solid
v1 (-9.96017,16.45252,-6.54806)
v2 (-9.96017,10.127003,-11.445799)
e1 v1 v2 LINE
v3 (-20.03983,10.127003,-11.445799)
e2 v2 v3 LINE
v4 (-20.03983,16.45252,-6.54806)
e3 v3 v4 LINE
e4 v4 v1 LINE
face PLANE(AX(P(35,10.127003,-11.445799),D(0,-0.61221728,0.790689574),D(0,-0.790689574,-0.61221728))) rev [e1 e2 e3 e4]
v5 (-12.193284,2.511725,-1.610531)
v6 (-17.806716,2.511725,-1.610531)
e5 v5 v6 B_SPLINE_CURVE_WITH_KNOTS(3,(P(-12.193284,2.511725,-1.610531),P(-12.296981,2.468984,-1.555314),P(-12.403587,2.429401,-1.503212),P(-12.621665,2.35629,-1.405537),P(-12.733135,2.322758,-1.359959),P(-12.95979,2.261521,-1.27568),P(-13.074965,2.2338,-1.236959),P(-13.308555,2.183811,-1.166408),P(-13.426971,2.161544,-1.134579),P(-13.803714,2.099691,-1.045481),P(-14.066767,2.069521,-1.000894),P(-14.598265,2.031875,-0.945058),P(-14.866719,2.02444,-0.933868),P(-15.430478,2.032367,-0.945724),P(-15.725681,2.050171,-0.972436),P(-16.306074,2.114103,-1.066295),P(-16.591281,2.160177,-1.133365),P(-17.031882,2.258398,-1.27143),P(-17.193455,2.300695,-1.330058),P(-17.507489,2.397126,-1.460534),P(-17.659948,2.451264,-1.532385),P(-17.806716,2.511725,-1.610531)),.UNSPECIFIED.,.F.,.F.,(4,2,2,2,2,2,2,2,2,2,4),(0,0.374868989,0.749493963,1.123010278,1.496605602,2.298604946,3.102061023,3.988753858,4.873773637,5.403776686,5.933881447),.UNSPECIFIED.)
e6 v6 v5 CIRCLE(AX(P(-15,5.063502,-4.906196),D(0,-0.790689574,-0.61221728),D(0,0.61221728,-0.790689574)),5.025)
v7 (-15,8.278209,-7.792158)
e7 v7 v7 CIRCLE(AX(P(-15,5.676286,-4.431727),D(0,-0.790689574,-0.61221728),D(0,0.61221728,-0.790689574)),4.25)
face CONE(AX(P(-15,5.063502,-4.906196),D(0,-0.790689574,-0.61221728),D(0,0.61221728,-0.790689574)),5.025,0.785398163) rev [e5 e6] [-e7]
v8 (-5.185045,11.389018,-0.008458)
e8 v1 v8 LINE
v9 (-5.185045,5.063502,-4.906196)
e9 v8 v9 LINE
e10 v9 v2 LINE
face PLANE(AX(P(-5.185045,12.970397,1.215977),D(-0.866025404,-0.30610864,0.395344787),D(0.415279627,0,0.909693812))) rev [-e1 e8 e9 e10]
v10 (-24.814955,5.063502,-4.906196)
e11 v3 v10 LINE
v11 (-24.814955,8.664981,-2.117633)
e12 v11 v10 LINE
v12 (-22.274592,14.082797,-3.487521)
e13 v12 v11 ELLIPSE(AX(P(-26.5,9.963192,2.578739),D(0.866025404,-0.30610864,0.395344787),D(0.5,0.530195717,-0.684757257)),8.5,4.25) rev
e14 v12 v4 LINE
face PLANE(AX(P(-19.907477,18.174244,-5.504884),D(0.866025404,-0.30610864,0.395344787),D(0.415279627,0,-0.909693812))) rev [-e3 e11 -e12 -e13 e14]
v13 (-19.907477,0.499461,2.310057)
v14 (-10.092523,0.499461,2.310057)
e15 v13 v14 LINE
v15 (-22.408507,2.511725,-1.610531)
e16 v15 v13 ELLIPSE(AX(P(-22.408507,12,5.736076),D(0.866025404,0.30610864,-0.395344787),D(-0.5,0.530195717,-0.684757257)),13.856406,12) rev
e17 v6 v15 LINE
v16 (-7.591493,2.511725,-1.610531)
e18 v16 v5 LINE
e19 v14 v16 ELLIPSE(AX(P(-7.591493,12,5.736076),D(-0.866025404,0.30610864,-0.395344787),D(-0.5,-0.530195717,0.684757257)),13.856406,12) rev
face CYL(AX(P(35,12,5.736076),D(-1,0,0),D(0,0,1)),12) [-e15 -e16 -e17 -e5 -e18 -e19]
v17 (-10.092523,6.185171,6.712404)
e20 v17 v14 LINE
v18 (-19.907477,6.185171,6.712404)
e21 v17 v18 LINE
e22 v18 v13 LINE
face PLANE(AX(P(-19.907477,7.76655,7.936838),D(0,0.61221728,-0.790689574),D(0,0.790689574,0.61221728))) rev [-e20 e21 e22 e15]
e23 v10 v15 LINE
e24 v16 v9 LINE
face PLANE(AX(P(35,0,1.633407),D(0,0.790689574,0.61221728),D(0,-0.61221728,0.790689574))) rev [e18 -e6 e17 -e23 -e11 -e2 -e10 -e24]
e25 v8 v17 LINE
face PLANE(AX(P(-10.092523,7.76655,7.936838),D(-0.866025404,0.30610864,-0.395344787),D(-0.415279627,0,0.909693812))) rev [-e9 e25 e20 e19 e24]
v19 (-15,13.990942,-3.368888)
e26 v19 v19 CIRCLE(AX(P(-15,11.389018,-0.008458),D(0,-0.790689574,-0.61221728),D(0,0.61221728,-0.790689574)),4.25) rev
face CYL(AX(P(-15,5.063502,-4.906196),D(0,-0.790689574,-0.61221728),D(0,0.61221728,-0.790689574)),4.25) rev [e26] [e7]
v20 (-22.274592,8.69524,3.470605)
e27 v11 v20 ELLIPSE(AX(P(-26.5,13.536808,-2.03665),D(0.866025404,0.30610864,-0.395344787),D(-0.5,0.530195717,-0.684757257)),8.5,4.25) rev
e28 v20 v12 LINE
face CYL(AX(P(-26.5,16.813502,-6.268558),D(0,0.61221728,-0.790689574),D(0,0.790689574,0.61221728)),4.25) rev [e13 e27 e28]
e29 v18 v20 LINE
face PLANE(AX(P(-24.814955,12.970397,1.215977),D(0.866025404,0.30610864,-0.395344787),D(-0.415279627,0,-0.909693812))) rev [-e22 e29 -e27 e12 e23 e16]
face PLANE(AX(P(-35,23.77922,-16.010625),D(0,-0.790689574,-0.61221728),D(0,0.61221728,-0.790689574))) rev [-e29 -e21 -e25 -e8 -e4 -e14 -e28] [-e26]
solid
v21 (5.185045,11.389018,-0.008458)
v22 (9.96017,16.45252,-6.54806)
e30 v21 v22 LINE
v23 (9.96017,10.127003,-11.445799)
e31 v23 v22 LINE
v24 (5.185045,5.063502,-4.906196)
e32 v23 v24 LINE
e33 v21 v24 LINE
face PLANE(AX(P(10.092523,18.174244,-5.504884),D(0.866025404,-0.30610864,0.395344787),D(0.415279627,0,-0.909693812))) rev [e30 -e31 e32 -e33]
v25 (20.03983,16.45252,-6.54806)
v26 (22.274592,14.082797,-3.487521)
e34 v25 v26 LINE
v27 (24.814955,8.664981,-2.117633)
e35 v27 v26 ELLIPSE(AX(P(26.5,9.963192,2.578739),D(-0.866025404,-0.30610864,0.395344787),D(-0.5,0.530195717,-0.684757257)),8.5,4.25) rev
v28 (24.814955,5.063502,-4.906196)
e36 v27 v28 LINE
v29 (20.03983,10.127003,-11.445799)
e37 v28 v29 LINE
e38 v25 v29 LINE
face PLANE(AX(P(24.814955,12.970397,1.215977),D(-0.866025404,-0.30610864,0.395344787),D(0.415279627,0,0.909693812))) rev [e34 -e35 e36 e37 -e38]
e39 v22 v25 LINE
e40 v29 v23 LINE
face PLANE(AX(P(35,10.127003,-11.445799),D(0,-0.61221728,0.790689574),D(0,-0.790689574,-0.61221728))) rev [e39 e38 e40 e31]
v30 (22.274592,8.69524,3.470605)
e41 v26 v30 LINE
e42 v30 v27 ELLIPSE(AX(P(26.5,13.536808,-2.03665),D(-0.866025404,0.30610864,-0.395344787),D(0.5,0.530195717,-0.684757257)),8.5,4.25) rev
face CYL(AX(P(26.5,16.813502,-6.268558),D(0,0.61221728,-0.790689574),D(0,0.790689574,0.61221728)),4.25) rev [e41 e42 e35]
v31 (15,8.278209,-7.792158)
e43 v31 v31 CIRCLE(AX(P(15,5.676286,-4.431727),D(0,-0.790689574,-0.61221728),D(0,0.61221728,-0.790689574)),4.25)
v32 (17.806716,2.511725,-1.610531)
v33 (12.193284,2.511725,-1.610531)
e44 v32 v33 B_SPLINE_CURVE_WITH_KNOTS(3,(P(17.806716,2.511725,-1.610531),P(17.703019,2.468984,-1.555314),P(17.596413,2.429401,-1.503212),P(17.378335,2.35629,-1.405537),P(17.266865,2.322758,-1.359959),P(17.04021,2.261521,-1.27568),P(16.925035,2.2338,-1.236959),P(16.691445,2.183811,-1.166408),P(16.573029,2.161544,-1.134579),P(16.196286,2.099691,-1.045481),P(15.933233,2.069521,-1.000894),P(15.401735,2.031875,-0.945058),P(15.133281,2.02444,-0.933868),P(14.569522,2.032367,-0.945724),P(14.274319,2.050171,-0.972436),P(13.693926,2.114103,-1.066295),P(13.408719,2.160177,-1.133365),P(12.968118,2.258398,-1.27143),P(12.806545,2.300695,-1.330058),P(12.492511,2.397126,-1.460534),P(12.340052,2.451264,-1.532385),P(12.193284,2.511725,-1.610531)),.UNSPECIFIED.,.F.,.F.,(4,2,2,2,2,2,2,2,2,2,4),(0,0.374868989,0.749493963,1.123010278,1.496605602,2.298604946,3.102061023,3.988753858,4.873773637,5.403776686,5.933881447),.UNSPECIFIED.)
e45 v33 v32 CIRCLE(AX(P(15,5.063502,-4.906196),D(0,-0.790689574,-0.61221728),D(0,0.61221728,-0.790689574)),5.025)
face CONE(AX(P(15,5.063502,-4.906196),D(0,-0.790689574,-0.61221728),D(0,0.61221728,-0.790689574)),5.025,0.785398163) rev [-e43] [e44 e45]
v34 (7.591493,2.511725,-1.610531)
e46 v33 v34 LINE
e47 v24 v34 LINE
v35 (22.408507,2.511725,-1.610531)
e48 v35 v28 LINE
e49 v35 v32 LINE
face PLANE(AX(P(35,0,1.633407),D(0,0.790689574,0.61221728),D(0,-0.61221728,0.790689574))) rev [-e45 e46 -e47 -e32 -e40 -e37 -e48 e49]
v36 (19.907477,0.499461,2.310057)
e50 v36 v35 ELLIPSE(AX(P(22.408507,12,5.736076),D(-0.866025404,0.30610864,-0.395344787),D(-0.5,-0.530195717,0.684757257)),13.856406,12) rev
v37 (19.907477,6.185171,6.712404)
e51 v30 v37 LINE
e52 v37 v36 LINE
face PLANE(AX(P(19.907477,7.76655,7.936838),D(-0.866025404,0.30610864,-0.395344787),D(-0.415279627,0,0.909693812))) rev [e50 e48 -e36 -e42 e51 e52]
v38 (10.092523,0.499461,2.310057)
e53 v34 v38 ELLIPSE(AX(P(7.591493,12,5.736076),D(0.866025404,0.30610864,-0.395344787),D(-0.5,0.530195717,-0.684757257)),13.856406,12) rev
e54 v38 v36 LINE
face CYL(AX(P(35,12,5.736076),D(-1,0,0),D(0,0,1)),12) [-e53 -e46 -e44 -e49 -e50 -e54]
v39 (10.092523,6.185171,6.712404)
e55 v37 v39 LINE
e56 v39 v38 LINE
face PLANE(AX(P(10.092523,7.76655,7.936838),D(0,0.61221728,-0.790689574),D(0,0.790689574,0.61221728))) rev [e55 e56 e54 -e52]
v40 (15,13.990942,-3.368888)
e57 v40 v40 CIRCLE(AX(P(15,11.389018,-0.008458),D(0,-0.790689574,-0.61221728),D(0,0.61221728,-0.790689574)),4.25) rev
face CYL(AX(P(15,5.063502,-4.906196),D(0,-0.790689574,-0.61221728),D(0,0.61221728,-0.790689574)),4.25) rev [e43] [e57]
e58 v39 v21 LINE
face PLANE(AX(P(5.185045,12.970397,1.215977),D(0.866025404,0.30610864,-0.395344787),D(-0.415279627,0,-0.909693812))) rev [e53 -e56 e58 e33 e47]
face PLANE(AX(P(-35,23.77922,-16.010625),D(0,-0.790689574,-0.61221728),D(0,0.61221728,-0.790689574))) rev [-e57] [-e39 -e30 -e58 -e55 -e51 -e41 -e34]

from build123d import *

# Parameters (mm, degrees)
SKETCH1_W                    = 70
SKETCH1_H                    = 60
BOSS_EXTRUDE1_DEPTH          = 23.5
SKETCH2_R                    = 4.5
CUT_EXTRUDE1_DEPTH           = 80.701003758
CUT_EXTRUDE4_DEPTH           = 80.701003758
M10_TAPPED_HOLE1_D           = 8.5
M10_TAPPED_HOLE1_DEPTH       = 27.5
M10_TAPPED_HOLE1_CSINK_D     = 10.05
M10_TAPPED_HOLE1_CSINK_ANGLE = 90
M10_TAPPED_HOLE1_TIP         = 2.553657631
M10_TAPPED_HOLE2_D           = 8.5
M10_TAPPED_HOLE2_CSINK_D     = 10.05
M10_TAPPED_HOLE2_CSINK_ANGLE = 90
SKETCH5_W                    = 3
SKETCH5_H                    = 31.956569969
SKETCH5_W_2                  = 11.5
SKETCH5_H_2                  = 27.892636229
CUT_EXTRUDE2_DEPTH           = 52.742149163
CHAMFER1_SIZE                = 3
FILLET1_R                    = 12
SKETCH9_OUTSIDE_W            = 88.936
SKETCH9_OUTSIDE_H            = 66.094
CUT_EXTRUDE5_DEPTH           = 10
CUT_EXTRUDE6_DEPTH           = 80.701003758


with BuildPart() as part:
    # Sketch1 → Boss-Extrude1 (new body)
    with BuildSketch(Plane(origin=(0, 0, 0), x_dir=(1, 0, 0), z_dir=(0, 1, 0))):
        Rectangle(SKETCH1_W, SKETCH1_H)
    extrude(amount=BOSS_EXTRUDE1_DEPTH)

    # Sketch2 → Cut-Extrude1 (cut, through all)
    with BuildSketch(Plane(origin=(35, 0, 0), x_dir=(0, 0, -1), z_dir=(1, 0, 0))):
        with Locations((-18.25, 11.75)):
            Circle(SKETCH2_R)
    extrude(amount=-CUT_EXTRUDE1_DEPTH, mode=Mode.SUBTRACT)

    # Sketch6 → Cut-Extrude4 (cut, through all)
    with BuildSketch(Plane.ZY.offset(35)):
        Polygon((1.633407015, 0), (-11.44579872, 10.127003094), (5.022332022, 31.39588867), (-21.600150891, 35.884663023), (-49.264135094, 11.821162325), (1.633407015, -46.691886902), align=None)
    extrude(amount=-CUT_EXTRUDE4_DEPTH, mode=Mode.SUBTRACT)

    # M10 Tapped Hole1
    with Locations(Plane(origin=(0, 11.814481877, -13.625207767), x_dir=(-1, 0, 0), z_dir=(0, -0.7906895737438469, -0.612217280034445))):
        with Locations((-15, -11.027098629), (15, -11.027098629)):
            CounterSinkHole(M10_TAPPED_HOLE1_D / 2, M10_TAPPED_HOLE1_CSINK_D / 2, depth=M10_TAPPED_HOLE1_DEPTH, counter_sink_angle=M10_TAPPED_HOLE1_CSINK_ANGLE)
            with Locations((0, 0, -(M10_TAPPED_HOLE1_DEPTH + M10_TAPPED_HOLE1_TIP / 2))):  # 118° drill point
                Cone(0, M10_TAPPED_HOLE1_D / 2, M10_TAPPED_HOLE1_TIP, mode=Mode.SUBTRACT)

    # M10 Tapped Hole2 (through all)
    with Locations(Plane(origin=(0, 9.336313521, -12.058016), x_dir=(-1, 0, 0), z_dir=(0, 0.6122172800344449, -0.790689573743847))):
        with Locations((-26.5, 9.456540563), (0, 9.456540563), (26.5, 9.456540563)):
            CounterSinkHole(M10_TAPPED_HOLE2_D / 2, M10_TAPPED_HOLE2_CSINK_D / 2, counter_sink_angle=M10_TAPPED_HOLE2_CSINK_ANGLE)

    # Sketch5 → Cut-Extrude2 (cut, through all)
    with BuildSketch(Plane(origin=(0, 23.5, 0), x_dir=(1, 0, 0), z_dir=(0, 1, 0))):
        with Locations((-25.25926979, -22.978284985)):
            Rectangle(SKETCH5_W, SKETCH5_H)
        with Locations((0, -20.946318115)):
            Rectangle(SKETCH5_W_2, SKETCH5_H_2)
        with Locations((25.25926979, -22.978284985)):
            Rectangle(SKETCH5_W, SKETCH5_H)
    extrude(amount=-CUT_EXTRUDE2_DEPTH, mode=Mode.SUBTRACT)

    # Chamfer1
    chamfer1_edges = [part.edges().sort_by_distance(p)[0] for p in [
        (30.879634895, 0, 30),
        (30.879634895, 23.5, 30),
        (14.754634895, 0, 30),
        (14.754634895, 23.5, 30),
        (-30.879634895, 0, 30),
        (-30.879634895, 23.5, 30),
        (-14.754634895, 0, 30),
        (-14.754634895, 23.5, 30),
    ]]
    chamfer(chamfer1_edges, length=CHAMFER1_SIZE)

    # Fillet1
    # the kernel refuses this fillet: 12 mm, written as the material it takes off along each edge
    with BuildSketch(Plane(origin=(-45.256673558, 0, 1.633407015), x_dir=(0, 0, 1), z_dir=(1, 0, 0))) as fillet1_piece_1:
        with BuildLine():
            CenterArc((FILLET1_R * 0.341889118589, -FILLET1_R), FILLET1_R, 90, 37.75)
            Line((-FILLET1_R * 0.270328161445, -FILLET1_R * 0.209310426256), (0, 0))
            Line((0, 0), (FILLET1_R * 0.341889118589, 0))
        make_face()
    extrude(amount=90.513347115, mode=Mode.SUBTRACT)

    # Sketch9 outside → Cut-Extrude5 (cut)
    with BuildSketch(Plane(origin=(0, 10.739220374, -12.236488293), x_dir=(-1, 0, 0), z_dir=(0, 0.7906895737438466, 0.612217280034445))):
        with Locations((0, 16.392)):
            Rectangle(SKETCH9_OUTSIDE_W, SKETCH9_OUTSIDE_H)
        Polygon((19.907477288, 0.770758948), (24.814954576, 9.270758948), (19.907477288, 17.770758948), (10.092522712, 17.770758948), (5.185045424, 9.270758948), (10.092522712, 0.770758948), align=None, mode=Mode.SUBTRACT)
        Polygon((-10.092522712, 0.770758948), (-5.185045424, 9.270758948), (-10.092522712, 17.770758948), (-19.907477288, 17.770758948), (-24.814954576, 9.270758948), (-19.907477288, 0.770758948), align=None, mode=Mode.SUBTRACT)
    extrude(amount=CUT_EXTRUDE5_DEPTH, mode=Mode.SUBTRACT)

    # Sketch10 → Cut-Extrude6 (cut, through all)
    with BuildSketch(Plane(origin=(35, 0, 0), x_dir=(0, 0, -1), z_dir=(1, 0, 0))):
        Polygon((-12.900576366, 61.118553113), (16.010624605, 23.779219648), (-27.760891181, -10.112308997), (-56.672092153, 27.227024468), align=None)
    extrude(amount=-CUT_EXTRUDE6_DEPTH, mode=Mode.SUBTRACT)


with BuildPart() as cut_extrude6_piece_1:
    # of the separate pieces the step leaves, piece 1, a body of its own (cut_extrude6_pieces)
    add(part.part.solids().sort_by_distance((-9.960170329, 16.452519684, -6.548060479))[0])


with BuildPart() as cut_extrude6_piece_2:
    # of the separate pieces the step leaves, piece 2, a body of its own (cut_extrude6_pieces)
    add(part.part.solids().sort_by_distance((20.039829671, 16.452519684, -6.548060479))[0])


solid = Compound([cut_extrude6_piece_1.part, cut_extrude6_piece_2.part])
